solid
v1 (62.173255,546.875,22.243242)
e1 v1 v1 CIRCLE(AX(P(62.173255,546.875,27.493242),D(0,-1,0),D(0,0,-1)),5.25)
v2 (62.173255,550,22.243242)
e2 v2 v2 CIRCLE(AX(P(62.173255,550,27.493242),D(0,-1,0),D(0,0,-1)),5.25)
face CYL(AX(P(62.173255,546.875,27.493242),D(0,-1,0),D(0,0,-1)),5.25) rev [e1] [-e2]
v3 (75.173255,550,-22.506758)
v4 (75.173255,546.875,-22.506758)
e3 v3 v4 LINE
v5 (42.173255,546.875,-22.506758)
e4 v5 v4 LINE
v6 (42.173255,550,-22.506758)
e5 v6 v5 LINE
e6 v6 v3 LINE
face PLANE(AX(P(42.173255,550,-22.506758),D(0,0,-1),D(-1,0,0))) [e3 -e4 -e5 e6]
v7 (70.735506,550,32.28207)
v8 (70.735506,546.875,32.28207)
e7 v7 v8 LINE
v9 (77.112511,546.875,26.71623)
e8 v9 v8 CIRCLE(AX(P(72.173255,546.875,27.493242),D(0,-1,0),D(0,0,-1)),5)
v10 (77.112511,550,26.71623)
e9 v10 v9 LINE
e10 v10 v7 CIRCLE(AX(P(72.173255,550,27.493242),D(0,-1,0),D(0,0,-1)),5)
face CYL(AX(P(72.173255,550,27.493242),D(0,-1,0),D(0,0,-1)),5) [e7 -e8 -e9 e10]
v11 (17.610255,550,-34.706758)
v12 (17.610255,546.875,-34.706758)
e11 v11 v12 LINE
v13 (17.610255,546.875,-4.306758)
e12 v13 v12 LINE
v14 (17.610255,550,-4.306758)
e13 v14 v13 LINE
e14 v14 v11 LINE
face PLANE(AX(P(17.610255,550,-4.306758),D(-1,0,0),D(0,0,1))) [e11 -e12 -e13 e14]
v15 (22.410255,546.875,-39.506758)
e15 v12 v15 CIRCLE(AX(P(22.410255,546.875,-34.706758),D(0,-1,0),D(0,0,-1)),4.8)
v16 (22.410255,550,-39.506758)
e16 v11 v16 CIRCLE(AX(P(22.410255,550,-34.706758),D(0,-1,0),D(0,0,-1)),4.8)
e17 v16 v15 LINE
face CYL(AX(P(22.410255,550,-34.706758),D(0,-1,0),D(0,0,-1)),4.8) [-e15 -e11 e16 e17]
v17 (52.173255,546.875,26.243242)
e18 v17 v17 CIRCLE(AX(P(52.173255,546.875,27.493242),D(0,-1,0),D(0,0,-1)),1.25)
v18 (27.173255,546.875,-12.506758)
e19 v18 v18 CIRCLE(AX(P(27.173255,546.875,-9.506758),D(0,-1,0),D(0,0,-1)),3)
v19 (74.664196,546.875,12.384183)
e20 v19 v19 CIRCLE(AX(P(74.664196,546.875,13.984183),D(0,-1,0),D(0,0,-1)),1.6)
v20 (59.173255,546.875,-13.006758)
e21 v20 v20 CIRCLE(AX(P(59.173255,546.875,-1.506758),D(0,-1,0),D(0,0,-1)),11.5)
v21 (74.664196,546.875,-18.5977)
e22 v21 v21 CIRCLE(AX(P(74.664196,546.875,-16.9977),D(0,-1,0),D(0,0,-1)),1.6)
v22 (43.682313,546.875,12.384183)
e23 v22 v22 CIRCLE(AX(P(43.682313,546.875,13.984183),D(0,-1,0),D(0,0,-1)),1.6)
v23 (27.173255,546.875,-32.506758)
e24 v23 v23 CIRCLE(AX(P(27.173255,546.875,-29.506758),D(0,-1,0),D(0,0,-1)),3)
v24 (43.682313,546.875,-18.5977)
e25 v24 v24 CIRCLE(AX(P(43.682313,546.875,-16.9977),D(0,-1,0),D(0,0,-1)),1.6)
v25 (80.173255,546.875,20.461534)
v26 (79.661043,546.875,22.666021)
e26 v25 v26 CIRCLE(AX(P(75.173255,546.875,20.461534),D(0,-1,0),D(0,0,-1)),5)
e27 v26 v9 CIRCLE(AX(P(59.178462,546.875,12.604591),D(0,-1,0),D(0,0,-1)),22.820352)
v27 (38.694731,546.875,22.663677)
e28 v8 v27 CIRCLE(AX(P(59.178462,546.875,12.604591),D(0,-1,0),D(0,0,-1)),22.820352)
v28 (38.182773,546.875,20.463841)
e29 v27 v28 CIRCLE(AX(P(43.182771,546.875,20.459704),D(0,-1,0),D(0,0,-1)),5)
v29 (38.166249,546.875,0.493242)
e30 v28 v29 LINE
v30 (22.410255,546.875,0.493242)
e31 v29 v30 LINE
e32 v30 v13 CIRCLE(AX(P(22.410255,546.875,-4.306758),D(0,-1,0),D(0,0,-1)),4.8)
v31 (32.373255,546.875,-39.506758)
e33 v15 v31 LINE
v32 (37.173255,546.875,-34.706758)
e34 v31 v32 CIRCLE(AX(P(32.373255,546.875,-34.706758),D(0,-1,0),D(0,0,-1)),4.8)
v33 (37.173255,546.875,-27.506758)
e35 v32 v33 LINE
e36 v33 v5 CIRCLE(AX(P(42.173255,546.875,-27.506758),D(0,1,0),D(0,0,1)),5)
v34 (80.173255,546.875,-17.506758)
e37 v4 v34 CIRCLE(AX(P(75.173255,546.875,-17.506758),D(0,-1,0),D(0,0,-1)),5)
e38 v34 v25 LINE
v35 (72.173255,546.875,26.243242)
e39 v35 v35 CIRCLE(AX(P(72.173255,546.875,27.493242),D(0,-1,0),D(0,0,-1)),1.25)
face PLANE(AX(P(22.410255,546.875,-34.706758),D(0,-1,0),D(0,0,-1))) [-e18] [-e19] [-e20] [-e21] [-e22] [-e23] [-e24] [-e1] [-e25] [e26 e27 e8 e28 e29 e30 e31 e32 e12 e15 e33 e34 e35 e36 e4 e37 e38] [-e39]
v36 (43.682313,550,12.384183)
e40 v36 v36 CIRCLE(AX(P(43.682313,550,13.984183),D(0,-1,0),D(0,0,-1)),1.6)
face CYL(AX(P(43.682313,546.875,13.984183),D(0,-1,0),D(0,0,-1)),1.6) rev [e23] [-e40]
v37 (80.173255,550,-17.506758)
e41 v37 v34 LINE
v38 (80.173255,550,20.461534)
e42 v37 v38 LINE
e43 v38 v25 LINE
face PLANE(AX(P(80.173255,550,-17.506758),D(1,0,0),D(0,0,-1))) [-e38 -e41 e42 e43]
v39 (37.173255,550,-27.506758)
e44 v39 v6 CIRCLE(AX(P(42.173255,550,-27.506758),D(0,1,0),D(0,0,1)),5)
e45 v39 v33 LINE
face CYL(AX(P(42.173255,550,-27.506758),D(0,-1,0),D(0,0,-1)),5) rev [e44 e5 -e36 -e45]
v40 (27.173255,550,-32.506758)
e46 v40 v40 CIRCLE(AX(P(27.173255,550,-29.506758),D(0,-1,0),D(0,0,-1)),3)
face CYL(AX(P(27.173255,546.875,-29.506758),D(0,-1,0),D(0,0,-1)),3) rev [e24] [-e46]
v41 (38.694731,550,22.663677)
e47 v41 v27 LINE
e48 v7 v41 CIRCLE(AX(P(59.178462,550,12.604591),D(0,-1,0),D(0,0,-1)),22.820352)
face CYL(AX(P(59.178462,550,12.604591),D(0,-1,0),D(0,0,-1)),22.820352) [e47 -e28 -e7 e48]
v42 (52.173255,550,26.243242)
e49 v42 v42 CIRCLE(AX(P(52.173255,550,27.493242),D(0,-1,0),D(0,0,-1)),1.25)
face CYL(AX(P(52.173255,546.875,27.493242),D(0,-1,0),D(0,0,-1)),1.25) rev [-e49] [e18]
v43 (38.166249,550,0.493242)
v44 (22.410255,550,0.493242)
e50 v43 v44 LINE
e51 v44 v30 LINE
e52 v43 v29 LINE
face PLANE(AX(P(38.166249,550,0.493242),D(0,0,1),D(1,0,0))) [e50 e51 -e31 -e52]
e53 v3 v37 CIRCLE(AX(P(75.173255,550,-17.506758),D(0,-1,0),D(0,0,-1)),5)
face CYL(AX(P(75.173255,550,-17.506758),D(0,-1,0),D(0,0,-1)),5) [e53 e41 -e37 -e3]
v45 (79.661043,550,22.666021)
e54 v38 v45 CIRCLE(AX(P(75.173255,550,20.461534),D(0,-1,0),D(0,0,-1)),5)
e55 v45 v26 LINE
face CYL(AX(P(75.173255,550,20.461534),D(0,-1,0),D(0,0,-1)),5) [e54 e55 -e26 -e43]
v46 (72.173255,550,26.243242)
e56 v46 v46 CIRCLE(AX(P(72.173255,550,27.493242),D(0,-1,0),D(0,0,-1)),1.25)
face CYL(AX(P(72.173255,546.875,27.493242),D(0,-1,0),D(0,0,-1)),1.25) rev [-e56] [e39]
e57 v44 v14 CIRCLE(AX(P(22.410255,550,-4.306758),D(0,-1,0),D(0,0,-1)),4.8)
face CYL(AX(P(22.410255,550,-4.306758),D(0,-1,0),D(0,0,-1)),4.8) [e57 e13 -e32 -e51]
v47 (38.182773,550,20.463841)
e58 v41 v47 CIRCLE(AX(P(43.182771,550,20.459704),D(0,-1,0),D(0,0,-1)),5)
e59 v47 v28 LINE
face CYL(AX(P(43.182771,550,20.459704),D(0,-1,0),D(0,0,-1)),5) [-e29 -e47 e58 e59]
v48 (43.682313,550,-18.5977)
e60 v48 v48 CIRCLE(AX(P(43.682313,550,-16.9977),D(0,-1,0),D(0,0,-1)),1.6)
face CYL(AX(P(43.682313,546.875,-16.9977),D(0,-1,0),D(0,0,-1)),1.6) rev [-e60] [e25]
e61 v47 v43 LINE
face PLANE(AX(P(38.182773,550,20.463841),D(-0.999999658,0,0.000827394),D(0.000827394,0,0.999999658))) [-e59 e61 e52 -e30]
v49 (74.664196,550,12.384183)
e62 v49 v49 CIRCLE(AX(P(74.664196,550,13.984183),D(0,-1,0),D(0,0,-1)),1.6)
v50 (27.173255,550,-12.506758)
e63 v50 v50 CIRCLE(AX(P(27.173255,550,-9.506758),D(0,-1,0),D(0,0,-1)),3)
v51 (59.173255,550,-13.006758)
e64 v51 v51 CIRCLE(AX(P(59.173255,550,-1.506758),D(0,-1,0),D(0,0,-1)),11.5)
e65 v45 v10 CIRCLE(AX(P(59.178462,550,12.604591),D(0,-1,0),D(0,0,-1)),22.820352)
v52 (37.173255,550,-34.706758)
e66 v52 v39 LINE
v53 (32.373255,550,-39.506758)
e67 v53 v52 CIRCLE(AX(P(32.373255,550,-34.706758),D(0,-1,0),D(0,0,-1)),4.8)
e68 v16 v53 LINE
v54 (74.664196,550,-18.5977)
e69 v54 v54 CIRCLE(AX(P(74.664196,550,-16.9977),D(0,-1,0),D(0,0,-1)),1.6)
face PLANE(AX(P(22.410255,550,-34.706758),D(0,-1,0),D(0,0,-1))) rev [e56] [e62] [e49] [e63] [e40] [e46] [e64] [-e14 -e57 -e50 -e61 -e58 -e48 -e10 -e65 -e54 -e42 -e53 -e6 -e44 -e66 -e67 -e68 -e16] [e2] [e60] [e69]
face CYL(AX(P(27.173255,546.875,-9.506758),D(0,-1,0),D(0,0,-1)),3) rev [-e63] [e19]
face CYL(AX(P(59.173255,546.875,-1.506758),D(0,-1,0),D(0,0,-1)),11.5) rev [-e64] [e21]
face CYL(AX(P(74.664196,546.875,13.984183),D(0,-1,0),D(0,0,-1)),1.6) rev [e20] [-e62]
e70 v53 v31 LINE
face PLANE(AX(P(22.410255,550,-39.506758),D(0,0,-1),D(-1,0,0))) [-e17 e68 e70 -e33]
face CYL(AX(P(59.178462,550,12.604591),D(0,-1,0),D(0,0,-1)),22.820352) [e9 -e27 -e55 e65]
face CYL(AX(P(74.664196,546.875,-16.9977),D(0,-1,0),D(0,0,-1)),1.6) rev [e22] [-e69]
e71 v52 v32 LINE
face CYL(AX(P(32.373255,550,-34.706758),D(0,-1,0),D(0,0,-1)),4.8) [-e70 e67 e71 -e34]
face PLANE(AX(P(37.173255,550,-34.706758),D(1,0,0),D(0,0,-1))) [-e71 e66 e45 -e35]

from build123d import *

# Parameters (mm, degrees)
BASE_FLANGE1_DEPTH           = 3.125
F_10_5_10_5_DIAMETER_HOLE1_D = 10.5
F_3_2_3_2_DIAMETER_HOLE1_D   = 3.2
F_23_0_23_DIAMETER_HOLE1_D   = 23
F_6_0_6_DIAMETER_HOLE1_D     = 6
F_2_5_2_5_DIAMETER_HOLE1_D   = 2.5


# Sheet-metal steps are written as plain solids
with BuildPart() as part:
    # Sketch11 → Base-Flange1 (new body)
    with BuildSketch(Plane.XZ.offset(-546.875)):
        with BuildLine():
            Line((22.410254546, -39.506758362), (32.373254546, -39.506758362))
            ThreePointArc((32.373254546, -39.506758362), (35.767367096, -38.100870912), (37.173254546, -34.706758362))
            Line((37.173254546, -34.706758362), (37.173254546, -27.506758362))
            ThreePointArc((37.173254546, -27.506758362), (38.63772064, -23.971224456), (42.173254546, -22.506758362))
            Line((42.173254546, -22.506758362), (75.173254546, -22.506758362))
            ThreePointArc((75.173254546, -22.506758362), (78.708788452, -21.042292268), (80.173254546, -17.506758362))
            Line((80.173254546, -17.506758362), (80.173254546, 20.461534485))
            ThreePointArc((80.173254546, 20.461534485), (80.043518399, 21.59313954), (79.661042546, 22.666020563))
            ThreePointArc((79.661042546, 22.666020563), (78.493233643, 24.758111736), (77.112510881, 26.71623016))
            ThreePointArc((77.112510881, 26.71623016), (75.461078133, 31.260231972), (70.735506318, 32.282070323))
            ThreePointArc((70.735506318, 32.282070323), (52.617226801, 34.461366888), (38.694730703, 22.663676919))
            ThreePointArc((38.694730703, 22.663676919), (38.312910767, 21.593045514), (38.182772618, 20.463841312))
            Line((38.182772618, 20.463841312), (38.16624905, 0.493241638))
            Line((38.16624905, 0.493241638), (22.410254546, 0.493241638))
            ThreePointArc((22.410254546, 0.493241638), (19.016141997, -0.912645812), (17.610254546, -4.306758362))
            Line((17.610254546, -4.306758362), (17.610254546, -34.706758362))
            ThreePointArc((17.610254546, -34.706758362), (19.016141997, -38.100870912), (22.410254546, -39.506758362))
        make_face()
    extrude(amount=-BASE_FLANGE1_DEPTH)

    # Ø10.5 (10.5) Diameter Hole1 (through all)
    with Locations(Plane(origin=(0, 546.875, 0), x_dir=(-1, 0, 0), z_dir=(0, -1, 0))):
        with Locations((-62.173254546, -27.493241638)):
            Hole(F_10_5_10_5_DIAMETER_HOLE1_D / 2)

    # Ø3.2 (3.2) Diameter Hole1 (through all)
    with Locations(Plane(origin=(0, 546.875, 0), x_dir=(-1, 0, 0), z_dir=(0, -1, 0))):
        with Locations((-74.664196355, -13.984183447), (-43.682312737, -13.984183447), (-43.682312737, 16.997700171), (-74.664196355, 16.997700171)):
            Hole(F_3_2_3_2_DIAMETER_HOLE1_D / 2)

    # Ø23.0 (23) Diameter Hole1 (through all)
    with Locations(Plane(origin=(0, 546.875, 0), x_dir=(-1, 0, 0), z_dir=(0, -1, 0))):
        with Locations((-59.173254546, 1.506758362)):
            Hole(F_23_0_23_DIAMETER_HOLE1_D / 2)

    # Ø6.0 (6) Diameter Hole1 (through all)
    with Locations(Plane(origin=(0, 546.875, 0), x_dir=(-1, 0, 0), z_dir=(0, -1, 0))):
        with Locations((-27.173254546, 9.506758362), (-27.173254546, 29.506758362)):
            Hole(F_6_0_6_DIAMETER_HOLE1_D / 2)

    # Ø2.5 (2.5) Diameter Hole1 (through all)
    with Locations(Plane(origin=(0, 546.875, 0), x_dir=(-1, 0, 0), z_dir=(0, -1, 0))):
        with Locations((-72.173254546, -27.493241653), (-52.173254546, -27.493241653)):
            Hole(F_2_5_2_5_DIAMETER_HOLE1_D / 2)


solid = part.part
